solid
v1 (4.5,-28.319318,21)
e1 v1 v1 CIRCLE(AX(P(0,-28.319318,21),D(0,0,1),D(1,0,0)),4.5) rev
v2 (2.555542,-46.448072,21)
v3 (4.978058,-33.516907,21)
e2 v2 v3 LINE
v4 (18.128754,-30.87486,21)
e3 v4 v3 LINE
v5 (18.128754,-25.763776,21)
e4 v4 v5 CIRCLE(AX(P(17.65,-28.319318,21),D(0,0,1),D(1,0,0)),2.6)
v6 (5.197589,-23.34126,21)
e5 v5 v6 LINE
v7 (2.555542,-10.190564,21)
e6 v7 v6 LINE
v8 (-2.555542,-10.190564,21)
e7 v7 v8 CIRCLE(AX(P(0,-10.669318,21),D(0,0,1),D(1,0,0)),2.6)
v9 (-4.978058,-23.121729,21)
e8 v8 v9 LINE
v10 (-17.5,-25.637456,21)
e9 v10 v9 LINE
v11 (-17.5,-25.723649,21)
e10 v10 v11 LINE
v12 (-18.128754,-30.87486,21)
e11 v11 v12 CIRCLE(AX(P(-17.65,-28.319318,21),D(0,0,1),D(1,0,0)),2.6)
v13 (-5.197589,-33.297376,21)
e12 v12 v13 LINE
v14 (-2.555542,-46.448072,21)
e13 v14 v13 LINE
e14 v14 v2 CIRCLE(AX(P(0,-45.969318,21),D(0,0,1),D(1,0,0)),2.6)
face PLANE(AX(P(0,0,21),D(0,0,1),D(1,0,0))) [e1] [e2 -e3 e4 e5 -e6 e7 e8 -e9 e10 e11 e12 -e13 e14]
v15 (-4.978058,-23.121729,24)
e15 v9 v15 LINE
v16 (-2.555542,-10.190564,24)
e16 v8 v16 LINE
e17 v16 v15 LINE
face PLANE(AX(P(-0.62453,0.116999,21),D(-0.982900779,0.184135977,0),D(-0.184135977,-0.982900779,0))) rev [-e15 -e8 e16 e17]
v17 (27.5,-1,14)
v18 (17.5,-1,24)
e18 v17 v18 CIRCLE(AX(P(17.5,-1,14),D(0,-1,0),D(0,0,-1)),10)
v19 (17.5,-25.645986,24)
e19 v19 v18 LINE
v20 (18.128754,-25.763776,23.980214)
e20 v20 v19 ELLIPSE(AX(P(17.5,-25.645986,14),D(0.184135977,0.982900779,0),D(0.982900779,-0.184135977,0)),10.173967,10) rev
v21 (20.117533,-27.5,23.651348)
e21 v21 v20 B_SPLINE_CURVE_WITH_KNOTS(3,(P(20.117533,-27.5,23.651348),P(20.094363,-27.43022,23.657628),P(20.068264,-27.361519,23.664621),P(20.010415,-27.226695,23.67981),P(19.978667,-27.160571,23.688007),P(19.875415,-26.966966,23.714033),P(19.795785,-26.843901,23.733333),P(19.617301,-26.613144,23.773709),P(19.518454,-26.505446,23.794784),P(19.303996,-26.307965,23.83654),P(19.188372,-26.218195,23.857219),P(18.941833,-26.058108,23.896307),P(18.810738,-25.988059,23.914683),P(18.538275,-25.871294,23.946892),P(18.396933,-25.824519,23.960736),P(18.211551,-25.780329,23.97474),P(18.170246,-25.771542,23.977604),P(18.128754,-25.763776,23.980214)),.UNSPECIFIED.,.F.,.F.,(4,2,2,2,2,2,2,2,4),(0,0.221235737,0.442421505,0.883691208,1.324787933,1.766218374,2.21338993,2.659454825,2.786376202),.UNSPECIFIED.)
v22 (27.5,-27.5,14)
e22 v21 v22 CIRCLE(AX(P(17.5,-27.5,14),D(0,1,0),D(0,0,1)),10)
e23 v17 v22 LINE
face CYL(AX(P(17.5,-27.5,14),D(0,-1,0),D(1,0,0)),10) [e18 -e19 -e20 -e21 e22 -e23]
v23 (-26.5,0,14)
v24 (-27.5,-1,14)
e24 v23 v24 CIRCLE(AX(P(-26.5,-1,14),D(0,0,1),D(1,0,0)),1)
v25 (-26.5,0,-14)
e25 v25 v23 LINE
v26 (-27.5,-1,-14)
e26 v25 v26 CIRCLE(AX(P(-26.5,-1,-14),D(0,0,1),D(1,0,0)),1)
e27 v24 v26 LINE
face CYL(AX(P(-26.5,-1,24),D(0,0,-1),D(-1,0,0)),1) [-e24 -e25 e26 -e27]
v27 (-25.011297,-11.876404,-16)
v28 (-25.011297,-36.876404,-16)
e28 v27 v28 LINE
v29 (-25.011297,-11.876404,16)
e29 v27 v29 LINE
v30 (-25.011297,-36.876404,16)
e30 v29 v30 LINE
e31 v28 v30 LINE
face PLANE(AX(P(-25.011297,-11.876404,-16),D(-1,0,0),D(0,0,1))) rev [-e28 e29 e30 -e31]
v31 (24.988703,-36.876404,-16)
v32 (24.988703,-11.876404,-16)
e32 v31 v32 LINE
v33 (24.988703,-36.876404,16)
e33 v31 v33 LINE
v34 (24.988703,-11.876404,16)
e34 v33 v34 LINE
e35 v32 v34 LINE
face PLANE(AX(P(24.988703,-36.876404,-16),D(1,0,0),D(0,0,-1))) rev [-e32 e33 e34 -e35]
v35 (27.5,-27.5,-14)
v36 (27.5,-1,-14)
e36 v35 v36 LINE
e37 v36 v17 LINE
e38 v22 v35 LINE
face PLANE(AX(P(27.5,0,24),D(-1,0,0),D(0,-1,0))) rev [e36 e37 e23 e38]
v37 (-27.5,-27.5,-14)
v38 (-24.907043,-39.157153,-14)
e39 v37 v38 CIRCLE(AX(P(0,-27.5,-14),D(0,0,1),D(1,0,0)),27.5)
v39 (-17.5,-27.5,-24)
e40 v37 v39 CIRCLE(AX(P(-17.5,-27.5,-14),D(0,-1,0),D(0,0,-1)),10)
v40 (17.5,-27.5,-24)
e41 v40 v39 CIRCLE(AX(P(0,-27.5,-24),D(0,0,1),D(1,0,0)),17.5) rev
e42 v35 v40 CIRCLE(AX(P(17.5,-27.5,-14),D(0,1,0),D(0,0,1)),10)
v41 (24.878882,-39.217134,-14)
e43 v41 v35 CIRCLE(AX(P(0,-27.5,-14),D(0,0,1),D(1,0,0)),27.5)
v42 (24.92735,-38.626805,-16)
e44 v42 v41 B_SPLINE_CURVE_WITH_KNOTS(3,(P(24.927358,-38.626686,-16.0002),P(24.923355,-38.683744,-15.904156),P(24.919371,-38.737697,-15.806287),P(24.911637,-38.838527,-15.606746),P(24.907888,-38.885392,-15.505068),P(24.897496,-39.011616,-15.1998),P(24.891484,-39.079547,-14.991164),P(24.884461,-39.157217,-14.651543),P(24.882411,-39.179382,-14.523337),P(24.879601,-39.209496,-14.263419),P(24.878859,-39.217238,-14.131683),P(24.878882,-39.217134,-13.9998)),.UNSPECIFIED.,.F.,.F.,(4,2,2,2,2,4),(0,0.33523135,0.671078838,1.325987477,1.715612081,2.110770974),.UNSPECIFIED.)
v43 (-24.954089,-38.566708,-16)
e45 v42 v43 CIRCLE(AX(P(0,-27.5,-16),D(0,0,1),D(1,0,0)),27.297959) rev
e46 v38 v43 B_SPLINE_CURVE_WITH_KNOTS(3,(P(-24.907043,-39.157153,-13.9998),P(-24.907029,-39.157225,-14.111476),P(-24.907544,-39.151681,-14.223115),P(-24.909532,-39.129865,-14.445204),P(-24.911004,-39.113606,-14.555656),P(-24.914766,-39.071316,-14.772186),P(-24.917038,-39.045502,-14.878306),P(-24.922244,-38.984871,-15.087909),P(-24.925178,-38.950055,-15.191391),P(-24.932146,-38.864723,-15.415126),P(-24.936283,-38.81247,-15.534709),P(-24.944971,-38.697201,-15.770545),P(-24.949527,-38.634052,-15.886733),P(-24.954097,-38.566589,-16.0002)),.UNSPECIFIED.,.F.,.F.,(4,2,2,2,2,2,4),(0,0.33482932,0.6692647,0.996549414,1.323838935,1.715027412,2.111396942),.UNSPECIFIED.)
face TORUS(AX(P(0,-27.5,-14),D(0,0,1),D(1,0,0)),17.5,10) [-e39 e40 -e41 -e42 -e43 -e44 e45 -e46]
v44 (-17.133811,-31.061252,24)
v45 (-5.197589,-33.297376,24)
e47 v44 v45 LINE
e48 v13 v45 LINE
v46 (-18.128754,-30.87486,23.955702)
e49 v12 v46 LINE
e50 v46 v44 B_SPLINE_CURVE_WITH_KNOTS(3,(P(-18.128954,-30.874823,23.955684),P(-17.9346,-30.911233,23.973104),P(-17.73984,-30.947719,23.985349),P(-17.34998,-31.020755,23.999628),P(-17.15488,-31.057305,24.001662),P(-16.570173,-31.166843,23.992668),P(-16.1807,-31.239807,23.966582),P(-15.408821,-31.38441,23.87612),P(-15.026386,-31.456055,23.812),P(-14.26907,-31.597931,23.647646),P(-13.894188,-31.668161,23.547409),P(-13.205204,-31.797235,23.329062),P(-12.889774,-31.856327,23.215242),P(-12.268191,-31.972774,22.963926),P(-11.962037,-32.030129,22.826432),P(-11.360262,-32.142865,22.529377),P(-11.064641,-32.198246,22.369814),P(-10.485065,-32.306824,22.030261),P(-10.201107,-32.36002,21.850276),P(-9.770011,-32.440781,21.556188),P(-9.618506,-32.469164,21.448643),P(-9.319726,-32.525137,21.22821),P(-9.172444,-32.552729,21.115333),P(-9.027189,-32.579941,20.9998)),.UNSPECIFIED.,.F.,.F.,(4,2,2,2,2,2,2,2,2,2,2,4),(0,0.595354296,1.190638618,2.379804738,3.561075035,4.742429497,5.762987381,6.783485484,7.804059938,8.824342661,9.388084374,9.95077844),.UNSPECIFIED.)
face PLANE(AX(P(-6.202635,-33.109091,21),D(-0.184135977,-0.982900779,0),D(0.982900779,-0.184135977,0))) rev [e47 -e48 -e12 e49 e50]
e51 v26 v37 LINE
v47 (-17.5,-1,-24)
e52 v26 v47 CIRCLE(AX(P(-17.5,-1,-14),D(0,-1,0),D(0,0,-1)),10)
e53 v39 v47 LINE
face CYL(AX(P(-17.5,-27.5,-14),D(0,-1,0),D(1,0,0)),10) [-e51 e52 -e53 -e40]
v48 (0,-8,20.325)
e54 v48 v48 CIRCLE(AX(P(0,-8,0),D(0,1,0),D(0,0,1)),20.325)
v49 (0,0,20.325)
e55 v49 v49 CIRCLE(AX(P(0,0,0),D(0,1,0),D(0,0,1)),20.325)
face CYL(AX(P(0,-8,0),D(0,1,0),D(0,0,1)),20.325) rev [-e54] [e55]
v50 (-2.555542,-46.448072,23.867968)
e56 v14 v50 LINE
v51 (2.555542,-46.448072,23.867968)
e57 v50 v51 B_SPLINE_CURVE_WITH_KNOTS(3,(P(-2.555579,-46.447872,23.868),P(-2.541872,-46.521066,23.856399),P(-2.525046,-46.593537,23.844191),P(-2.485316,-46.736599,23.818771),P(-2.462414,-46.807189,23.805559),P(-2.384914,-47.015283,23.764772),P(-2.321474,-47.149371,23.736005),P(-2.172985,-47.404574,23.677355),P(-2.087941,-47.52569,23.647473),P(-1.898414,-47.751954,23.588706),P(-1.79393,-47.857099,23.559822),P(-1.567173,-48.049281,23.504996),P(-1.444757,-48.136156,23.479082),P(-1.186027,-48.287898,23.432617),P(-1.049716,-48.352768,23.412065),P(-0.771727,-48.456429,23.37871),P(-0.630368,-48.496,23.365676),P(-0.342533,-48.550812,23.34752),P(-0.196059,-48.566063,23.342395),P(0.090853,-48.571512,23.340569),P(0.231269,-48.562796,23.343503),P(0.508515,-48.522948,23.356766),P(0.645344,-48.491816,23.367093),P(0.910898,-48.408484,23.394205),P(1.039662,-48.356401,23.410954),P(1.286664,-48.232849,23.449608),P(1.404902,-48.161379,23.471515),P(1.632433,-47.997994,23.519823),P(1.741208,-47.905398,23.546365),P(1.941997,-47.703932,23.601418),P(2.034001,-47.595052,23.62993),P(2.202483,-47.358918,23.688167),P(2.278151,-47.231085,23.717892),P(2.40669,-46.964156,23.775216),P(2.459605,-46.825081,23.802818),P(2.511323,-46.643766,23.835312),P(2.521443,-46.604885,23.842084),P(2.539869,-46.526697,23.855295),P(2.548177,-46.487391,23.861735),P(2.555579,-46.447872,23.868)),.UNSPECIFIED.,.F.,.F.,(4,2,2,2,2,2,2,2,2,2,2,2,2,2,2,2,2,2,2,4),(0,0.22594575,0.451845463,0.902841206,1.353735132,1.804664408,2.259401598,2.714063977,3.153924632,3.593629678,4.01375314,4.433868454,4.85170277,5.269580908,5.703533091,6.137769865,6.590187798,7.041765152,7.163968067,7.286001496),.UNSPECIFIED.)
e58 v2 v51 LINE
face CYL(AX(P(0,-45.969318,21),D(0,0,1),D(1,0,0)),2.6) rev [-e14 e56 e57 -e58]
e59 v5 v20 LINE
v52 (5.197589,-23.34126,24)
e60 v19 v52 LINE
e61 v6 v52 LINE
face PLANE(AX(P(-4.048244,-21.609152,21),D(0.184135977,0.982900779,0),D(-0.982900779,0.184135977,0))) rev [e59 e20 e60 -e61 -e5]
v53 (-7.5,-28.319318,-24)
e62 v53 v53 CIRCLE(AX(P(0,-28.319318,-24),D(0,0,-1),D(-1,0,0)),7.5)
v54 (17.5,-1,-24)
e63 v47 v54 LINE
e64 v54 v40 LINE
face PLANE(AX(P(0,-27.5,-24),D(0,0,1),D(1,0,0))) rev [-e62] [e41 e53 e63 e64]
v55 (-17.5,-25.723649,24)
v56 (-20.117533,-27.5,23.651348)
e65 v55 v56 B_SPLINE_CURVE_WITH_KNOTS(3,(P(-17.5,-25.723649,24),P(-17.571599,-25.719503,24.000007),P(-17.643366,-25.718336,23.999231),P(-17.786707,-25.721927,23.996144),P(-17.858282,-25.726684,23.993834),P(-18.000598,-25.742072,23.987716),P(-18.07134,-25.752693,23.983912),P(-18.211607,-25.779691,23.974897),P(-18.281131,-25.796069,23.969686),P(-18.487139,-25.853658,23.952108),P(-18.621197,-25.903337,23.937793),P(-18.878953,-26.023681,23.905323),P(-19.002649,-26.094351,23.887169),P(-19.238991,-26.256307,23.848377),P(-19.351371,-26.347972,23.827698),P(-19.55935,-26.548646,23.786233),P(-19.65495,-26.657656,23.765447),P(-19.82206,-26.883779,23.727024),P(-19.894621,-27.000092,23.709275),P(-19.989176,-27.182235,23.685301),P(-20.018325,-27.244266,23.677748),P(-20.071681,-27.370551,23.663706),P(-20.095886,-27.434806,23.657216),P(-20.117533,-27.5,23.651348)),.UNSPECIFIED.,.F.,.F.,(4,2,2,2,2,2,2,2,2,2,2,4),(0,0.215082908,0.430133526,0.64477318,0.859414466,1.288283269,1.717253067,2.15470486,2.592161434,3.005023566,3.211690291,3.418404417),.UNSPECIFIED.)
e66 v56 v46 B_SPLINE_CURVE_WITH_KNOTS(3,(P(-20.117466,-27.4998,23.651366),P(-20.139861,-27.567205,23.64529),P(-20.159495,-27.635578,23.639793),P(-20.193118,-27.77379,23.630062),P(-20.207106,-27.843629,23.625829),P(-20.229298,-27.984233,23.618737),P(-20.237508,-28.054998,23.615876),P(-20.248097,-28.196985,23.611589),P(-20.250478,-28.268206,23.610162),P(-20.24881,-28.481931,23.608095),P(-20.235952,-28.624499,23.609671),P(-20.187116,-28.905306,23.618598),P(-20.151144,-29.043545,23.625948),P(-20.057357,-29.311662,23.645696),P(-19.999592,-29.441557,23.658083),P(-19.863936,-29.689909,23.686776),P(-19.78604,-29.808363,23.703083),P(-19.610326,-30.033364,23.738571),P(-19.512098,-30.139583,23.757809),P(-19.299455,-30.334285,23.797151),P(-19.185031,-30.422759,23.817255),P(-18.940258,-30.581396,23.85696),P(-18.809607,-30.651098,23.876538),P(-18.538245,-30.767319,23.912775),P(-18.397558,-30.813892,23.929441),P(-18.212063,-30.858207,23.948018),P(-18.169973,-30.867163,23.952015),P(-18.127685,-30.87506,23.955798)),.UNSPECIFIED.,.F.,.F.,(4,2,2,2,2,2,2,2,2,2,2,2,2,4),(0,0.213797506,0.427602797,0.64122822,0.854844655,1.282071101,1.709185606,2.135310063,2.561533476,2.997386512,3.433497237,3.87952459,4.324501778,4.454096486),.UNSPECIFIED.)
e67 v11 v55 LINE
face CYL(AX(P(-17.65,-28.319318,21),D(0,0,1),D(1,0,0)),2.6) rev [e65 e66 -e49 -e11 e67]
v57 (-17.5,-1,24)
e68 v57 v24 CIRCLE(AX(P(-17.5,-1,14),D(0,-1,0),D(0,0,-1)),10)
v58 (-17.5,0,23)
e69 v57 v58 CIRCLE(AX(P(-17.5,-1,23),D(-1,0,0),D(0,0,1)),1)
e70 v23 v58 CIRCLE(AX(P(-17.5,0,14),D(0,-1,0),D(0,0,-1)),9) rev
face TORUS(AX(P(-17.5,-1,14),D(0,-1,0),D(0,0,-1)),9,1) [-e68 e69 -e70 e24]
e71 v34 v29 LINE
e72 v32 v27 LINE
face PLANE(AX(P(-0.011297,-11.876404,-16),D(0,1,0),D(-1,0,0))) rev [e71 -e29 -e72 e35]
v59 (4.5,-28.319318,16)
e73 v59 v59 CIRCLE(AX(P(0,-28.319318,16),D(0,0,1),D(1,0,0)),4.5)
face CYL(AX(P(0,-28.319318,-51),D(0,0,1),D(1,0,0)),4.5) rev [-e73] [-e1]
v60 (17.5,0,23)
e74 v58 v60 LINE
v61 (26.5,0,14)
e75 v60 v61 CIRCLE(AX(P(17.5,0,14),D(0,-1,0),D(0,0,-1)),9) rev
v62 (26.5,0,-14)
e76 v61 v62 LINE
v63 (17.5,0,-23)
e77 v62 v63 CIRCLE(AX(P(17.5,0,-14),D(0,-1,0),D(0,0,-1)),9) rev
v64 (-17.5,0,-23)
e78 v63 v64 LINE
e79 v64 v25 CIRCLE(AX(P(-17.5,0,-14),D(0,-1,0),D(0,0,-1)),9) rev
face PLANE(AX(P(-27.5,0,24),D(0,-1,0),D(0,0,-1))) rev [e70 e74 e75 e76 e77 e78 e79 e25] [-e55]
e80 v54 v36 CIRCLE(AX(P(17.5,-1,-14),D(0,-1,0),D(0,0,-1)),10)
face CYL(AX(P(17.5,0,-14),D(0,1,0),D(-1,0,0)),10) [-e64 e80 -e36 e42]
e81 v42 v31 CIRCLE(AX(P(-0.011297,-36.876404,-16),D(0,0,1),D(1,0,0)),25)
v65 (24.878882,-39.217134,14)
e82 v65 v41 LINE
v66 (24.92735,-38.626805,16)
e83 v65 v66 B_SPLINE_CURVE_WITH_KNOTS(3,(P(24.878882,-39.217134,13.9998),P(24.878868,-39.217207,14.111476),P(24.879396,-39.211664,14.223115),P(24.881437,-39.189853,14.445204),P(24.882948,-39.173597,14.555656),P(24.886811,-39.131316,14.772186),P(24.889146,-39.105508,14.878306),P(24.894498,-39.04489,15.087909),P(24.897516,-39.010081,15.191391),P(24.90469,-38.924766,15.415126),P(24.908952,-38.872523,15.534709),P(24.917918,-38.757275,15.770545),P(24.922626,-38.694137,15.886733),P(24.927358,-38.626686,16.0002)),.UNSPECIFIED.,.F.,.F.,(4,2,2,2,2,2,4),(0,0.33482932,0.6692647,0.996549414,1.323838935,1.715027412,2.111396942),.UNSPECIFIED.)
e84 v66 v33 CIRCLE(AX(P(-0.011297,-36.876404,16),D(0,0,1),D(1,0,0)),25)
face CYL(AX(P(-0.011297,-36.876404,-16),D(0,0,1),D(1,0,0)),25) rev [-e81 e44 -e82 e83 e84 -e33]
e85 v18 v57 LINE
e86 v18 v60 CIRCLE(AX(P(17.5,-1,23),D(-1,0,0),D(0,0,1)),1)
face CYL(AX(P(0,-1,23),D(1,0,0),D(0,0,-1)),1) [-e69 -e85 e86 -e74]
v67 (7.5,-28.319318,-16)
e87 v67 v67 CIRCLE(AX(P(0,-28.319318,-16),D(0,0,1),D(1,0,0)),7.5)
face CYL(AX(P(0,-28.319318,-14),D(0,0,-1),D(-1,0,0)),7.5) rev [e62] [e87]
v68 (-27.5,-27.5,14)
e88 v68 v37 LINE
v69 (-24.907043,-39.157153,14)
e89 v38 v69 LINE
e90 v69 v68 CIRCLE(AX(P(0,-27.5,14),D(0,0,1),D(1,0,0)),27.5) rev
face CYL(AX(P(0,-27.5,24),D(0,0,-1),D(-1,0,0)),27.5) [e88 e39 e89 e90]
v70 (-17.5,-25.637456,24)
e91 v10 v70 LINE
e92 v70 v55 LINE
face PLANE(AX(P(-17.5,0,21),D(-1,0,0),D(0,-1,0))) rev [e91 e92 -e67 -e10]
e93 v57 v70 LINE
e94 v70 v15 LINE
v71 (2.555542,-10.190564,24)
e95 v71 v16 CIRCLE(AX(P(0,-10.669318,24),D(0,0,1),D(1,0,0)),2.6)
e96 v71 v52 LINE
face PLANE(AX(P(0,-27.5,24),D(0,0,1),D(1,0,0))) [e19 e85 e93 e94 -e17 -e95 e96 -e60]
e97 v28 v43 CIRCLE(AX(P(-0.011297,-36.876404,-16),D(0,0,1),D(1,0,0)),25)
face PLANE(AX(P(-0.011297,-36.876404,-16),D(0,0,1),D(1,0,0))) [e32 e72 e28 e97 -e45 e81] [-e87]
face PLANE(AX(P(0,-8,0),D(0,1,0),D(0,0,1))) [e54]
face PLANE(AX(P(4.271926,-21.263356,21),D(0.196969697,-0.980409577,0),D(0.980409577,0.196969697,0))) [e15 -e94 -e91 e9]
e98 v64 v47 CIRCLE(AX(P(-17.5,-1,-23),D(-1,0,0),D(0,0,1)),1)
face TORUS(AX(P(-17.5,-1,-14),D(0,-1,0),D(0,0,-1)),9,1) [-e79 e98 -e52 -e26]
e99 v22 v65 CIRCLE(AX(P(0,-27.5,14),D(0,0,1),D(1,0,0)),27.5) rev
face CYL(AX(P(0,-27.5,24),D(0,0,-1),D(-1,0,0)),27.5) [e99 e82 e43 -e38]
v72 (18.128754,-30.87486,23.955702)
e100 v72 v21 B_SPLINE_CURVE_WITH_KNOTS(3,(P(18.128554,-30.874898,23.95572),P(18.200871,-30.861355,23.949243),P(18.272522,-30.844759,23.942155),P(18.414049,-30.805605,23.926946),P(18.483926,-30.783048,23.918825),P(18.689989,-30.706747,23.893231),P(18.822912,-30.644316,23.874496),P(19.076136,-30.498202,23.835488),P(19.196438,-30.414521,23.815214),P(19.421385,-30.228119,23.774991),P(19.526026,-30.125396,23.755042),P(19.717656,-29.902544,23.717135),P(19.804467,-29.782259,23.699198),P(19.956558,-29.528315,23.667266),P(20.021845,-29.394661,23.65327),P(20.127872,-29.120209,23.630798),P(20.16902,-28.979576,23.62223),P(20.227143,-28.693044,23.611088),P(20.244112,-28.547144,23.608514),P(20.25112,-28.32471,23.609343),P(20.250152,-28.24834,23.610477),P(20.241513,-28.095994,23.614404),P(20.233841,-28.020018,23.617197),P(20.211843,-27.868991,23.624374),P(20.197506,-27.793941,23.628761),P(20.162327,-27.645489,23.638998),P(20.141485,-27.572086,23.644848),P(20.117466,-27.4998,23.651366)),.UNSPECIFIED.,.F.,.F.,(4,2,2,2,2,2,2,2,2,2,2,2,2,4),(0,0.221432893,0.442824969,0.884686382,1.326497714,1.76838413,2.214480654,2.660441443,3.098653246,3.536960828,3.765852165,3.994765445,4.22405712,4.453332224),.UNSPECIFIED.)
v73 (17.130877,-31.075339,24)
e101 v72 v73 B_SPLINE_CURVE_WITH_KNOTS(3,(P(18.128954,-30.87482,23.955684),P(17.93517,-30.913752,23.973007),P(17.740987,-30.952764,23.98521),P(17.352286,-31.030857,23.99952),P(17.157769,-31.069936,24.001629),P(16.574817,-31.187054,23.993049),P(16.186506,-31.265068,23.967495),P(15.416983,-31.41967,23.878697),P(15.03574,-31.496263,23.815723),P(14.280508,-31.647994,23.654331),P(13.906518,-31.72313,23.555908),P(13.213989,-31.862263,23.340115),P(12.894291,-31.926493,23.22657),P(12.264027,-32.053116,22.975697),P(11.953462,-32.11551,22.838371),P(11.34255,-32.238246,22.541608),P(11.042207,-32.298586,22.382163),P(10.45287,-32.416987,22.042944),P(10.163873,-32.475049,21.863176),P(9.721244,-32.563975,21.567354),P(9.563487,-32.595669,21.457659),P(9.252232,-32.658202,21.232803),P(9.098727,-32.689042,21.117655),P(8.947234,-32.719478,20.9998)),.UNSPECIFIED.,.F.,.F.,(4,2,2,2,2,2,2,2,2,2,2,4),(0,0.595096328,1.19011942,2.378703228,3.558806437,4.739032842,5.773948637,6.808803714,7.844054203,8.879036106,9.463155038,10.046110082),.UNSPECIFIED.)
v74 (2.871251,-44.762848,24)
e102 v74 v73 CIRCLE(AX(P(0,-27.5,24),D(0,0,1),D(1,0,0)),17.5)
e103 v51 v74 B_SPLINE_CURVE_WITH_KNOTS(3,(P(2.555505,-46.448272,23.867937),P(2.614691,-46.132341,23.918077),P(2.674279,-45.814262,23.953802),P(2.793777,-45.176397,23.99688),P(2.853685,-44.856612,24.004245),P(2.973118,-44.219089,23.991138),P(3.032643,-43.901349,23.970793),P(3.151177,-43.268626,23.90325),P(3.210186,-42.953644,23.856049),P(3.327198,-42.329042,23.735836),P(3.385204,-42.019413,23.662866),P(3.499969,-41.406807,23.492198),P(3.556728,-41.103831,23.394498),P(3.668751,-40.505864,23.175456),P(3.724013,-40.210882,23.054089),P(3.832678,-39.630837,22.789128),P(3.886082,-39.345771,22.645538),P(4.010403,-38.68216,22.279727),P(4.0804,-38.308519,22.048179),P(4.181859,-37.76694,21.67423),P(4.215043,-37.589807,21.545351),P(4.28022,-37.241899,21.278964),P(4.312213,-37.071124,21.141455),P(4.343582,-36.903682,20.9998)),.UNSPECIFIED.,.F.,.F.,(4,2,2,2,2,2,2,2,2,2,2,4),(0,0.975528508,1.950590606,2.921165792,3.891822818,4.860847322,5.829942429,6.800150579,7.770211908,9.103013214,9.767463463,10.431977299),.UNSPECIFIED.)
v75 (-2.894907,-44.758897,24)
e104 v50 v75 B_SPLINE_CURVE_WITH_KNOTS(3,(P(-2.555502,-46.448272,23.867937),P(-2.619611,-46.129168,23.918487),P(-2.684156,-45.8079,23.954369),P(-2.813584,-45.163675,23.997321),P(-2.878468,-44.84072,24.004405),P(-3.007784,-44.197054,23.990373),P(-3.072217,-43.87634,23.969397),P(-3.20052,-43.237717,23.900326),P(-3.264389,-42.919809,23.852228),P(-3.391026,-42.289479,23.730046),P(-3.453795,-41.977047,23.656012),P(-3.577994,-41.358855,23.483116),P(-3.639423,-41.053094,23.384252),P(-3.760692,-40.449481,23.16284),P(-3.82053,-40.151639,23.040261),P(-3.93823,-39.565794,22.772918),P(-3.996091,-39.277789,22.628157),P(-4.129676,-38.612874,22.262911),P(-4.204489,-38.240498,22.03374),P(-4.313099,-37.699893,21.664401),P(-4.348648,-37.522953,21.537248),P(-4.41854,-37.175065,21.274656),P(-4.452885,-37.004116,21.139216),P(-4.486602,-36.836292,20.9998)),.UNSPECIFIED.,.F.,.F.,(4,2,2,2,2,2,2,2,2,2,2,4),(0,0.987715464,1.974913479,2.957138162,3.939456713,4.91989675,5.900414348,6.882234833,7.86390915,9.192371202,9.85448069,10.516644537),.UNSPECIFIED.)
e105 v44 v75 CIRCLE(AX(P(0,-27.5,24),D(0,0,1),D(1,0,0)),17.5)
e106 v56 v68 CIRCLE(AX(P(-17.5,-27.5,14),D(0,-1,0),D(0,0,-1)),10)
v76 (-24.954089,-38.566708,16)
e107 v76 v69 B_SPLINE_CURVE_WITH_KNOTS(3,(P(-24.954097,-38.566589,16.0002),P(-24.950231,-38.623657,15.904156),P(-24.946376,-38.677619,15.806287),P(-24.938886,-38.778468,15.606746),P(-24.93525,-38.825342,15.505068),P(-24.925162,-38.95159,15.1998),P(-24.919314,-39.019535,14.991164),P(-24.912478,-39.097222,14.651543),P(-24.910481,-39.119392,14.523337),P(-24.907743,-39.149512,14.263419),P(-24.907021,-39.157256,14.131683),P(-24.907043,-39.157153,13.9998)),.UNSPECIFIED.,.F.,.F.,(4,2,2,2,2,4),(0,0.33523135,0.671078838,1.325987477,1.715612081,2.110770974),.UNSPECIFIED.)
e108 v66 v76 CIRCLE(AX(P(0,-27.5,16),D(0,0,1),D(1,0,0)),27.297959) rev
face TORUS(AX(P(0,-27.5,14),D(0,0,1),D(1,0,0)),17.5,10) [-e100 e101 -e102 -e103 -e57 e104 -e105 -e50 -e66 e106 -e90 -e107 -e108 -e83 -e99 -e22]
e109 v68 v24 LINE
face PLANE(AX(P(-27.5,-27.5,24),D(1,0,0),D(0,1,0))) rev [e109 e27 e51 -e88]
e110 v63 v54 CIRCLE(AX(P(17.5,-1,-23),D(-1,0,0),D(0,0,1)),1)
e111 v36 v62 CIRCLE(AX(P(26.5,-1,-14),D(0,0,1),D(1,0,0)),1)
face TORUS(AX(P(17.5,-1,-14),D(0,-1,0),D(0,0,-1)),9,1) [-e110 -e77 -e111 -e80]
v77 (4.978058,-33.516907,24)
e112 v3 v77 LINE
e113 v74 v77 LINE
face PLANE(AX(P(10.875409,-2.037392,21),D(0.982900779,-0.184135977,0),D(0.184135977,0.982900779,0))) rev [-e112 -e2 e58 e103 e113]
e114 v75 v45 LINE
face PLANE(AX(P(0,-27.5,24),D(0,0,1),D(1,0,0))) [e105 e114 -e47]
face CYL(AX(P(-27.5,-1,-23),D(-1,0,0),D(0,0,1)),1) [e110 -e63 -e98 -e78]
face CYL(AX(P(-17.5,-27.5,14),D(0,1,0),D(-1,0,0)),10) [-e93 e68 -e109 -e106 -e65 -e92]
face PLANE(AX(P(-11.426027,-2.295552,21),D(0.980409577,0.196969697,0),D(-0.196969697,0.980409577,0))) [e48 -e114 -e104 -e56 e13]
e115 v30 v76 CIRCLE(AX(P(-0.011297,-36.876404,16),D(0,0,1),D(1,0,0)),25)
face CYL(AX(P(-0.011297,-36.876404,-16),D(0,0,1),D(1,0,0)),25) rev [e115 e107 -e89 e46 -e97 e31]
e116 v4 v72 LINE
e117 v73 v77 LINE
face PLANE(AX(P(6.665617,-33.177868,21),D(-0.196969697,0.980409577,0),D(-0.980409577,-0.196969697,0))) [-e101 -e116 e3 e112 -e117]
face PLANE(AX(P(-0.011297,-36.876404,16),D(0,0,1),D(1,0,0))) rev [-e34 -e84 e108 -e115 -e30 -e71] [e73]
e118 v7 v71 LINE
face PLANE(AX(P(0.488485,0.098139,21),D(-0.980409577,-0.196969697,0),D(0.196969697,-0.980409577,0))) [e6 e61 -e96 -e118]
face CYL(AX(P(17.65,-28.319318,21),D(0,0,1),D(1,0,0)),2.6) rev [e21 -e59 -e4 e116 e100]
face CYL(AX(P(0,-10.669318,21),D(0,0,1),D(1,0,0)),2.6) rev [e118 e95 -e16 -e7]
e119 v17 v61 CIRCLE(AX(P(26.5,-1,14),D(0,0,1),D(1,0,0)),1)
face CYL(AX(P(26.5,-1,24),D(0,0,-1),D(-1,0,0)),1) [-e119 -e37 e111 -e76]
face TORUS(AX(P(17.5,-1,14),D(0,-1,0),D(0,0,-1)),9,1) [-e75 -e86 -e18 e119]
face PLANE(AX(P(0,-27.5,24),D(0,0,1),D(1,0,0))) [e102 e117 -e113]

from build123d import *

# Parameters (mm, degrees)
BOSS_EXTRUDE1_DEPTH = 24
SKETCH3_R           = 20.325
CUT_EXTRUDE1_DEPTH  = 8
FILLET1_R           = 10
FILLET5_R           = 1
CUT_EXTRUDE2_DEPTH  = 16
SKETCH10_R          = 4.5
CUT_EXTRUDE4_DEPTH  = 75
CUT_EXTRUDE5_DEPTH  = 3
SKETCH12_R          = 7.5
CUT_EXTRUDE6_DEPTH  = 10


with BuildPart() as part:
    # Sketch2 → Boss-Extrude1 (new, symmetric)
    with BuildSketch(Plane.XY):
        with BuildLine():
            Line((-27.5, -27.5), (-27.5, 0))
            Line((-27.5, 0), (27.5, 0))
            Line((27.5, 0), (27.5, -27.5))
            ThreePointArc((27.5, -27.5), (0, -55), (-27.5, -27.5))
        make_face()
    extrude(amount=BOSS_EXTRUDE1_DEPTH, both=True)

    # Sketch3 → Cut-Extrude1 (cut)
    with BuildSketch(Plane(origin=(0, 0, 0), x_dir=(1, 0, 0), z_dir=(0, 1, 0))):
        Circle(SKETCH3_R)
    extrude(amount=-CUT_EXTRUDE1_DEPTH, mode=Mode.SUBTRACT)

    # Fillet1
    fillet1_edges = [part.edges().sort_by_distance(p)[0] for p in [
        (27.5, -13.75, -24),
        (0, -55, -24),
        (27.5, -13.75, 24),
        (0, -55, 24),
        (-27.5, -13.75, -24),
        (-27.5, -13.75, 24),
    ]]
    fillet(fillet1_edges, radius=FILLET1_R)

    # Fillet5
    fillet5_edges = [part.edges().sort_by_distance(p)[0] for p in [
        (24.571067812, 0, 21.071067812),
        (0, 0, 24),
        (0, 0, -24),
        (24.571067812, 0, -21.071067812),
        (-24.571067812, 0, 21.071067812),
        (-24.571067812, 0, -21.071067812),
        (27.5, 0, 0),
        (-27.5, 0, 0),
    ]]
    fillet(fillet5_edges, radius=FILLET5_R)

    # Sketch7 → Cut-Extrude2 (cut, symmetric)
    with BuildSketch(Plane.XY):
        with BuildLine():
            Line((-0.011296589, -11.876404256), (-25.011296589, -11.876404256))
            Line((-25.011296589, -11.876404256), (-25.011296589, -36.876404256))
            ThreePointArc((-25.011296589, -36.876404256), (-0.011296589, -61.876404256), (24.988703411, -36.876404256))
            Line((24.988703411, -36.876404256), (24.988703411, -11.876404256))
            Line((24.988703411, -11.876404256), (-0.011296589, -11.876404256))
        make_face()
    extrude(amount=CUT_EXTRUDE2_DEPTH, both=True, mode=Mode.SUBTRACT)

    # Sketch10 → Cut-Extrude4 (cut)
    with BuildSketch(Plane.XY.offset(24)):
        with Locations((0, -28.319318025)):
            Circle(SKETCH10_R)
    extrude(amount=-CUT_EXTRUDE4_DEPTH, mode=Mode.SUBTRACT)

    # Sketch11 → Cut-Extrude5 (cut)
    with BuildSketch(Plane.XY.offset(24)):
        with BuildLine():
            Line((5.197589428, -23.341260326), (2.555542026, -10.190564483))
            ThreePointArc((2.555542026, -10.190564483), (0, -8.069318025), (-2.555542026, -10.190564483))
            Line((-2.555542026, -10.190564483), (-4.978057698, -23.121728597))
            Line((-4.978057698, -23.121728597), (-17.5, -25.637455941))
            Line((-17.5, -25.637455941), (-17.5, -25.723648554))
            ThreePointArc((-17.5, -25.723648554), (-20.230845732, -28.004301665), (-18.128753541, -30.874860051))
            Line((-18.128753541, -30.874860051), (-5.197589428, -33.297375723))
            Line((-5.197589428, -33.297375723), (-2.555542026, -46.448071566))
            ThreePointArc((-2.555542026, -46.448071566), (0, -48.569318025), (2.555542026, -46.448071566))
            Line((2.555542026, -46.448071566), (4.978057698, -33.516907452))
            Line((4.978057698, -33.516907452), (18.128753541, -30.874860051))
            ThreePointArc((18.128753541, -30.874860051), (20.25, -28.319318025), (18.128753541, -25.763775998))
            Line((18.128753541, -25.763775998), (5.197589428, -23.341260326))
        make_face()
    extrude(amount=-CUT_EXTRUDE5_DEPTH, mode=Mode.SUBTRACT)

    # Sketch12 → Cut-Extrude6 (cut)
    with BuildSketch(Plane(origin=(0, 0, -24), x_dir=(-1, 0, 0), z_dir=(0, 0, -1))):
        with Locations((0, -28.319318025)):
            Circle(SKETCH12_R)
    extrude(amount=-CUT_EXTRUDE6_DEPTH, mode=Mode.SUBTRACT)


solid = part.part
